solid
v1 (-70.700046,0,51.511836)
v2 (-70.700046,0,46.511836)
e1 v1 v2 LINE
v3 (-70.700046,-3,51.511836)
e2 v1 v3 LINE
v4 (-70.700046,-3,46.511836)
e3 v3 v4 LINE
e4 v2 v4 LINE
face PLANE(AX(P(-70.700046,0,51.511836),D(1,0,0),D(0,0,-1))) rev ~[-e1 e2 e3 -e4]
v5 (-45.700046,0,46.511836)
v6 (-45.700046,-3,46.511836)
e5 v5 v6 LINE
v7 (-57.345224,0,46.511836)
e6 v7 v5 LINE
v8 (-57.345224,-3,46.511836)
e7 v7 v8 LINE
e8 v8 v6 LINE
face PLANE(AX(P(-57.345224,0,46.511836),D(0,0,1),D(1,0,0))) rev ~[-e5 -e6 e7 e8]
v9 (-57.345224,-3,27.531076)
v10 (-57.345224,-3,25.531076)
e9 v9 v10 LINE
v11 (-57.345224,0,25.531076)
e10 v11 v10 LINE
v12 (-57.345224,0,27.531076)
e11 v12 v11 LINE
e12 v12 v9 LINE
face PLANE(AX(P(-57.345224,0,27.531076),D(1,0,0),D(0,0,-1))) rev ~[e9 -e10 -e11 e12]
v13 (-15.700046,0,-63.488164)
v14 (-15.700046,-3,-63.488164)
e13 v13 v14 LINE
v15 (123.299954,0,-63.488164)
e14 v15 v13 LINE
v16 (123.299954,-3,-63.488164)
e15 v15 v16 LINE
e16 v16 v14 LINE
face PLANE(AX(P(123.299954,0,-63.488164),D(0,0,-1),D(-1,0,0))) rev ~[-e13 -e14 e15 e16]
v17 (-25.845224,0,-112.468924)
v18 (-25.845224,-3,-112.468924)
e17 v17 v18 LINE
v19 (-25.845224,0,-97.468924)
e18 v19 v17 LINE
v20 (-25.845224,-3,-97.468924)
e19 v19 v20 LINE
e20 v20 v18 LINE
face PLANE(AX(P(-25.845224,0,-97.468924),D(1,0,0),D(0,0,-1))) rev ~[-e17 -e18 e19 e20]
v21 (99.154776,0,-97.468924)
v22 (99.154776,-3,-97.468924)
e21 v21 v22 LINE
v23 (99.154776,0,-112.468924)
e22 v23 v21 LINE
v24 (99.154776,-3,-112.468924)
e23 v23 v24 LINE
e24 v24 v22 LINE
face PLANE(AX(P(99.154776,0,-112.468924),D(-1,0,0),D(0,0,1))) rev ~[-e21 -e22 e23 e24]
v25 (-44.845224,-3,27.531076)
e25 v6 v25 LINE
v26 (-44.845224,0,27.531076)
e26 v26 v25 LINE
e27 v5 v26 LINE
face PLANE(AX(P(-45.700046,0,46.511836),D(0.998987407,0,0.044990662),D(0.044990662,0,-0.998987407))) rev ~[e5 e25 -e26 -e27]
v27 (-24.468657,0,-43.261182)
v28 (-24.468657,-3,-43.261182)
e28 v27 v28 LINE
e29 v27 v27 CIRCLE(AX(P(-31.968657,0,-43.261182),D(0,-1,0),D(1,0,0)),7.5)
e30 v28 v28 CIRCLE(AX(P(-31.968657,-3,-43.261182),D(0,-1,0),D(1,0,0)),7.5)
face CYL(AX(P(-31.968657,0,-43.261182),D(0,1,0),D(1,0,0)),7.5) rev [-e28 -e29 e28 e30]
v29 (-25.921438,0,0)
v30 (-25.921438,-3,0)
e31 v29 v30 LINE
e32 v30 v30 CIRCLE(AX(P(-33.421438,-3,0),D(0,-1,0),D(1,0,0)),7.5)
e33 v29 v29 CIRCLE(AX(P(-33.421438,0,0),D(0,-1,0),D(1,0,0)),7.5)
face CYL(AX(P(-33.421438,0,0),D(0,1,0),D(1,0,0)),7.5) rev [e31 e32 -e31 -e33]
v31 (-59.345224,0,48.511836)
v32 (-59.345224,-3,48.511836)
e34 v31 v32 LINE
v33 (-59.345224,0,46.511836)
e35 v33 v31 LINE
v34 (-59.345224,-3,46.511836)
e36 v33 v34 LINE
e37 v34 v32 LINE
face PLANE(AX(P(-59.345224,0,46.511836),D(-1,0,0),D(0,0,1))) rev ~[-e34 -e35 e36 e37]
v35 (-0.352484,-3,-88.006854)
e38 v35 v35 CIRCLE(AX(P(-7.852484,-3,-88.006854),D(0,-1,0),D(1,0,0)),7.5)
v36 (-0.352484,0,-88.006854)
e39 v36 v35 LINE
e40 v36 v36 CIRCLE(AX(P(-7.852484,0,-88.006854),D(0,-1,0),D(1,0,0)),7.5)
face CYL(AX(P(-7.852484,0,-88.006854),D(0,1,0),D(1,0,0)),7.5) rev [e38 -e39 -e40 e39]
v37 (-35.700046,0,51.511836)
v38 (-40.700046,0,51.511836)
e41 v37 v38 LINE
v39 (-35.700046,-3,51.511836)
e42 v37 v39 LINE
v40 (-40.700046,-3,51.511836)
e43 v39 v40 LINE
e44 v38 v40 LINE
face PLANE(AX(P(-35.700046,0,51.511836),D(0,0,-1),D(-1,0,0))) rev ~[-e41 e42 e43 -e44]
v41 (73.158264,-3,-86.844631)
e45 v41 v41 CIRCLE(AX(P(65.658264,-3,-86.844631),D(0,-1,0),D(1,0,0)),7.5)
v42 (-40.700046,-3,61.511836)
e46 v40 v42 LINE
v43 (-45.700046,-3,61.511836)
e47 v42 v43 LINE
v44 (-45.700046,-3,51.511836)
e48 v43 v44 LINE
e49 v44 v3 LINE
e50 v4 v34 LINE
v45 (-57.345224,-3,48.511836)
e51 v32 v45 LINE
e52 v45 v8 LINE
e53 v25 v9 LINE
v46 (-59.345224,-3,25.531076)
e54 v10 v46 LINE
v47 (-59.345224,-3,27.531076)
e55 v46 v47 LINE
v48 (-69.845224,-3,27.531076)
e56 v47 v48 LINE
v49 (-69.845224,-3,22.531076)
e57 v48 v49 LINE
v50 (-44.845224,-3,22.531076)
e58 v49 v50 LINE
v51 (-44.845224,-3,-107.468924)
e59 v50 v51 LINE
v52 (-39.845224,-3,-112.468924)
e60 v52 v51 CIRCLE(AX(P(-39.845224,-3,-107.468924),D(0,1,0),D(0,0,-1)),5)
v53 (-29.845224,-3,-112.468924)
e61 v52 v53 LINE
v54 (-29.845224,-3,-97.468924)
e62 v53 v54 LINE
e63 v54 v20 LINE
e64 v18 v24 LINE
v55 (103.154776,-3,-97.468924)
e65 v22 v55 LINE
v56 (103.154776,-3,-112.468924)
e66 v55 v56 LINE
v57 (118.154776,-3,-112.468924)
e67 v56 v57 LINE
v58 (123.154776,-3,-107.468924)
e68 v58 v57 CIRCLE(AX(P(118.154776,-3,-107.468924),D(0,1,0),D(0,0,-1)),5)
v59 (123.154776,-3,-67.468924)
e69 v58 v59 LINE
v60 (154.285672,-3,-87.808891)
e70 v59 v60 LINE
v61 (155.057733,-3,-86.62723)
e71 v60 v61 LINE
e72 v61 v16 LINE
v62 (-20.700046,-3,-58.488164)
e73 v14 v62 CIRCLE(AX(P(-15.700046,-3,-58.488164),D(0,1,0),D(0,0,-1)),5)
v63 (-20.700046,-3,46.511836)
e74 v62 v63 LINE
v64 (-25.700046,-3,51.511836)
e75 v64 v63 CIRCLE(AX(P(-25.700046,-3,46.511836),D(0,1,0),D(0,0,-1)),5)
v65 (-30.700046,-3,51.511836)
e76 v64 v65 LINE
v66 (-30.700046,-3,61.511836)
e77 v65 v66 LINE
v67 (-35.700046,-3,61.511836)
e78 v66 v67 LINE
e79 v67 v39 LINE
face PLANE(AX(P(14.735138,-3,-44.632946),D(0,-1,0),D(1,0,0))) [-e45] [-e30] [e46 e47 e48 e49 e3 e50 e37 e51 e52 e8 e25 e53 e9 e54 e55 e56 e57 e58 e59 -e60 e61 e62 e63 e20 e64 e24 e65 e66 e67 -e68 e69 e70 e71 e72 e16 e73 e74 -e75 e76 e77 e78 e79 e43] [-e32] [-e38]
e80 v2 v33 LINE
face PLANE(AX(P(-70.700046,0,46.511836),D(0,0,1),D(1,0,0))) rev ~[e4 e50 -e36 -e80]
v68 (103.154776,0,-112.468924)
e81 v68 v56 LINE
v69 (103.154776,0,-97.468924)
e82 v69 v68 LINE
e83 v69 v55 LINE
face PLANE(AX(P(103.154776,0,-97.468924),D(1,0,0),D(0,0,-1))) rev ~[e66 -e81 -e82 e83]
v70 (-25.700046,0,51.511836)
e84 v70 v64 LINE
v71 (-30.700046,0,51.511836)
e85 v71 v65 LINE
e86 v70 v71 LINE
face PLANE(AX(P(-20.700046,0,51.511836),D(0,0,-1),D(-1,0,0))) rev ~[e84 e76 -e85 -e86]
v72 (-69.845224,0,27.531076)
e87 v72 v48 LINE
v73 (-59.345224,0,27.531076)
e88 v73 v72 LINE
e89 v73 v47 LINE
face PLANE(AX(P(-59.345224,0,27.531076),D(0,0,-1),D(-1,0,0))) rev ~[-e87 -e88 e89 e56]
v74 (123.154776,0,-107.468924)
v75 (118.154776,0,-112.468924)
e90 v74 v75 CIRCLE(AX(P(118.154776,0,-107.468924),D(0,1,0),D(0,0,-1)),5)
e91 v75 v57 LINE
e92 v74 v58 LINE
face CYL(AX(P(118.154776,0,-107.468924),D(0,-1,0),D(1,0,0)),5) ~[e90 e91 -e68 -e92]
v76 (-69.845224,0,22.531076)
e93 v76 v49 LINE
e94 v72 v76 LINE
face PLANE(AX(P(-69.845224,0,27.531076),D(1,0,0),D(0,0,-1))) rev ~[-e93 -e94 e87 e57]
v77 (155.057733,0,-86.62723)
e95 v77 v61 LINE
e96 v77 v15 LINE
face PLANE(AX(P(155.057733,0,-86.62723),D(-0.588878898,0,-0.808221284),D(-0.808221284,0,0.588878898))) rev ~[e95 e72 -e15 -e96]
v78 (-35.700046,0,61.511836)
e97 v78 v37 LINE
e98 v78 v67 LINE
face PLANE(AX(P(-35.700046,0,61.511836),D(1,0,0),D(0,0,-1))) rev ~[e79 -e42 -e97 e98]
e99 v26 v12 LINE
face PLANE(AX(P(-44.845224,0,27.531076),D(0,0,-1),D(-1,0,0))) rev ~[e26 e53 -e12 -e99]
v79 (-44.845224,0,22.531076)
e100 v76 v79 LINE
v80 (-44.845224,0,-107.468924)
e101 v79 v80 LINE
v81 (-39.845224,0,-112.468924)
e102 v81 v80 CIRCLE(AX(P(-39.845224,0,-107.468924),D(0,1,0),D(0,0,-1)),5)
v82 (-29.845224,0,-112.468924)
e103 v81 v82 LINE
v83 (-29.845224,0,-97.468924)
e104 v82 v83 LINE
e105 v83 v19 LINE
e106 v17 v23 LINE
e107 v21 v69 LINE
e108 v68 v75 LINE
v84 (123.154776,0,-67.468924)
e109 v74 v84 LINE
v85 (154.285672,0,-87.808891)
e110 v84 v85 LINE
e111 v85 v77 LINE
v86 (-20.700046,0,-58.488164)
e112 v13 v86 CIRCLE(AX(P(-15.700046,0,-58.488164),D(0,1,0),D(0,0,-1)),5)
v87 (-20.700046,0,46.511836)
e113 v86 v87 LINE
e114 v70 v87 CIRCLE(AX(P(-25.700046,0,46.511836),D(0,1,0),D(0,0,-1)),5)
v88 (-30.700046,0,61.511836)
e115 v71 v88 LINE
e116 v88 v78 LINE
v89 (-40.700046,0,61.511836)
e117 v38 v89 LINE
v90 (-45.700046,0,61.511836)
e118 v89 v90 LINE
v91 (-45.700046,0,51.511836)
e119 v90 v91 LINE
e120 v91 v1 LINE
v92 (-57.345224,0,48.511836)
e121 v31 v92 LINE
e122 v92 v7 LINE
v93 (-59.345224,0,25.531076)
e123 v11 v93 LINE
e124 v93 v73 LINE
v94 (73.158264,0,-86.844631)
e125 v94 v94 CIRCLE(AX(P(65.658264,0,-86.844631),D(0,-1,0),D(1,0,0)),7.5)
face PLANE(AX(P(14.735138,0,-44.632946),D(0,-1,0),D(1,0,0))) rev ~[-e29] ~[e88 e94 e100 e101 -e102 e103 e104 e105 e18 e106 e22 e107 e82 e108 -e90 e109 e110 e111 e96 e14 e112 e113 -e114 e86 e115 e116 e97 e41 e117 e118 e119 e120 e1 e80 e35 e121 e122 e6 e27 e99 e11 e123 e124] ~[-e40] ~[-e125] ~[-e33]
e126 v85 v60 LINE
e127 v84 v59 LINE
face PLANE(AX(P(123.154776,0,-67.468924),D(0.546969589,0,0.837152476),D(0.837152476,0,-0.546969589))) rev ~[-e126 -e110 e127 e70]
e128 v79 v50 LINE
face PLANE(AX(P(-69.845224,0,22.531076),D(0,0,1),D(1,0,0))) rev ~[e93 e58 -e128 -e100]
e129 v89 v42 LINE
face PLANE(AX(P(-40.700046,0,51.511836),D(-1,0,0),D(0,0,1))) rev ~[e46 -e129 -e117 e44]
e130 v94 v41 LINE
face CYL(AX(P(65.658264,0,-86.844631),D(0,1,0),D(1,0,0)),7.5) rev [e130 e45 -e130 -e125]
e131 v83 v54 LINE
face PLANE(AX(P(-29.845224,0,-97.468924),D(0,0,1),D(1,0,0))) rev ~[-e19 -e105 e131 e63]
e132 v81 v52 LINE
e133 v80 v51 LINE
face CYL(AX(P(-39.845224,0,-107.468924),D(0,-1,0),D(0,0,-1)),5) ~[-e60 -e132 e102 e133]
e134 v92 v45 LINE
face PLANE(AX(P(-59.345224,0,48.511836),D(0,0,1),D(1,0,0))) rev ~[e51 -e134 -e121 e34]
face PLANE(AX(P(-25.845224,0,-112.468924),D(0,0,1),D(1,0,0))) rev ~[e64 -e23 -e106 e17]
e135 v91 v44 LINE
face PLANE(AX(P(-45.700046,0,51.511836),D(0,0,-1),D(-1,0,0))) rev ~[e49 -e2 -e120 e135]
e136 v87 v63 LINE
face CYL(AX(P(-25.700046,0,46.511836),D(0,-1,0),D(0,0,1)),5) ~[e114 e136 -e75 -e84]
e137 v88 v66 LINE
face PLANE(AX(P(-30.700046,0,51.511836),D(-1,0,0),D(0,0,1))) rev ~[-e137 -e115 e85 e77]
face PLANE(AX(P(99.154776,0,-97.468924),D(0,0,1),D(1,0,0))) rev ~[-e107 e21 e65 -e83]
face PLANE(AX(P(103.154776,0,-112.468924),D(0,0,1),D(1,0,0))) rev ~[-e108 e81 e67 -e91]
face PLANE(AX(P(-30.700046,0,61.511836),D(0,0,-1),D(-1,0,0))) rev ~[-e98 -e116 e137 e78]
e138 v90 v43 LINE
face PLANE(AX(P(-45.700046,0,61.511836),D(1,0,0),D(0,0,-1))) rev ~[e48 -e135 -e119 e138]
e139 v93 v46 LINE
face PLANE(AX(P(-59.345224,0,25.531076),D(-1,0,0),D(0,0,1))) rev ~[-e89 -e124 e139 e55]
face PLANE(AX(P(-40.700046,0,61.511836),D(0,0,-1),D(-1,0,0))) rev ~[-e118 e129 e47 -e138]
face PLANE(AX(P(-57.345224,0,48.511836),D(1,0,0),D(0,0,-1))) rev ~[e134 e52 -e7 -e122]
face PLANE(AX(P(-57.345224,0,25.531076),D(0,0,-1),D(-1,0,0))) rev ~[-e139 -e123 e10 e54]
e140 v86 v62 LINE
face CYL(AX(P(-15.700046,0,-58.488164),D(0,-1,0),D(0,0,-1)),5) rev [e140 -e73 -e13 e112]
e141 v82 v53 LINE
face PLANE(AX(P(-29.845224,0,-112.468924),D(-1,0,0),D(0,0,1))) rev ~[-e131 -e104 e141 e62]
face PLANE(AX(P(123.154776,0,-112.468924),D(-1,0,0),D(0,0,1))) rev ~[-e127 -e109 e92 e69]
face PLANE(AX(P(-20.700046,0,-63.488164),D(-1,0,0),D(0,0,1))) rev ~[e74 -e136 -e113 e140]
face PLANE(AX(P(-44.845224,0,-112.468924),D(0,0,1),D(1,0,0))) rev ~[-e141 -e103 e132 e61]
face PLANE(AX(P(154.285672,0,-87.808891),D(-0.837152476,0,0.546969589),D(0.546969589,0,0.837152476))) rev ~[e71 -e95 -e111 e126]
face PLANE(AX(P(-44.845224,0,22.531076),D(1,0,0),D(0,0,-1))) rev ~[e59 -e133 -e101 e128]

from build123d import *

# Parameters (mm, degrees)
F0_R     = 7.5
F1_DEPTH = 3
F2_R     = 5
F3_R     = 5
F4_R     = 5
F5_R     = 5


# Not quite as in the source:
# - a feature of the source that left no trace in its solid (it failed there, or was rolled back) is left out


with BuildPart() as f1:
    # F0 (on Front) → F1 (new body)
    with BuildSketch(Plane.XZ):
        Polygon((-45.7000464201, 51.51183635), (-70.7000464201, 51.51183635), (-70.7000464201, 46.51183635), (-63.6224076152, 46.51183635), (-59.3452238418, 46.51183635), (-59.3452238418, 48.51183635), (-57.3452238418, 48.51183635), (-57.3452238418, 46.51183635), (-45.7000464201, 46.51183635), (-44.8452238418, 27.5310756076), (-57.3452238418, 27.5310756076), (-57.3452238418, 25.5310756076), (-59.3452238418, 25.5310756076), (-59.3452238418, 27.5310756076), (-69.8452238418, 27.5310756076), (-69.8452238418, 22.5310756076), (-44.8452238418, 22.5310756076), (-44.8452238418, -112.4689243924), (-29.8452238418, -112.4689243924), (-29.8452238418, -97.4689243924), (-25.8452238418, -97.4689243924), (-25.8452238418, -112.4689243924), (99.1547761582, -112.4689243924), (99.1547761582, -97.4689243924), (103.1547761582, -97.4689243924), (103.1547761582, -112.4689243924), (123.1547761582, -112.4689243924), (123.1547761582, -67.4689243924), (154.2856724769, -87.808891194), (155.0577331575, -86.6272304158), (123.2999535799, -63.48816365), (-20.7000464201, -63.48816365), (-20.7000464201, 51.51183635), (-30.7000464201, 51.51183635), (-30.7000464201, 61.51183635), (-35.7000464201, 61.51183635), (-35.7000464201, 51.51183635), (-40.7000464201, 51.51183635), (-40.7000464201, 61.51183635), (-45.7000464201, 61.51183635), align=None)
        with Locations((-7.8524835408, -88.0068540573)):
            Circle(F0_R, mode=Mode.SUBTRACT)
        with Locations((-31.9686569273, -43.2611815631)):
            Circle(F0_R, mode=Mode.SUBTRACT)
        with Locations((65.6582638621, -86.8446305394)):
            Circle(F0_R, mode=Mode.SUBTRACT)
        with Locations((-33.4214381874, 0)):
            Circle(F0_R, mode=Mode.SUBTRACT)
    extrude(amount=F1_DEPTH)

    # F2
    f2_edges = [f1.edges().sort_by_distance(p)[0] for p in [
        (-20.700046, -1.5, 51.511836),
    ]]
    fillet(f2_edges, radius=F2_R)

    # F3
    f3_edges = [f1.edges().sort_by_distance(p)[0] for p in [
        (123.154776, -1.5, -112.468924),
    ]]
    fillet(f3_edges, radius=F3_R)

    # F4
    f4_edges = [f1.edges().sort_by_distance(p)[0] for p in [
        (-44.845224, -1.5, -112.468924),
    ]]
    fillet(f4_edges, radius=F4_R)

    # F5
    f5_edges = [f1.edges().sort_by_distance(p)[0] for p in [
        (-20.700046, -1.5, -63.488164),
    ]]
    fillet(f5_edges, radius=F5_R)


solid = f1.part
